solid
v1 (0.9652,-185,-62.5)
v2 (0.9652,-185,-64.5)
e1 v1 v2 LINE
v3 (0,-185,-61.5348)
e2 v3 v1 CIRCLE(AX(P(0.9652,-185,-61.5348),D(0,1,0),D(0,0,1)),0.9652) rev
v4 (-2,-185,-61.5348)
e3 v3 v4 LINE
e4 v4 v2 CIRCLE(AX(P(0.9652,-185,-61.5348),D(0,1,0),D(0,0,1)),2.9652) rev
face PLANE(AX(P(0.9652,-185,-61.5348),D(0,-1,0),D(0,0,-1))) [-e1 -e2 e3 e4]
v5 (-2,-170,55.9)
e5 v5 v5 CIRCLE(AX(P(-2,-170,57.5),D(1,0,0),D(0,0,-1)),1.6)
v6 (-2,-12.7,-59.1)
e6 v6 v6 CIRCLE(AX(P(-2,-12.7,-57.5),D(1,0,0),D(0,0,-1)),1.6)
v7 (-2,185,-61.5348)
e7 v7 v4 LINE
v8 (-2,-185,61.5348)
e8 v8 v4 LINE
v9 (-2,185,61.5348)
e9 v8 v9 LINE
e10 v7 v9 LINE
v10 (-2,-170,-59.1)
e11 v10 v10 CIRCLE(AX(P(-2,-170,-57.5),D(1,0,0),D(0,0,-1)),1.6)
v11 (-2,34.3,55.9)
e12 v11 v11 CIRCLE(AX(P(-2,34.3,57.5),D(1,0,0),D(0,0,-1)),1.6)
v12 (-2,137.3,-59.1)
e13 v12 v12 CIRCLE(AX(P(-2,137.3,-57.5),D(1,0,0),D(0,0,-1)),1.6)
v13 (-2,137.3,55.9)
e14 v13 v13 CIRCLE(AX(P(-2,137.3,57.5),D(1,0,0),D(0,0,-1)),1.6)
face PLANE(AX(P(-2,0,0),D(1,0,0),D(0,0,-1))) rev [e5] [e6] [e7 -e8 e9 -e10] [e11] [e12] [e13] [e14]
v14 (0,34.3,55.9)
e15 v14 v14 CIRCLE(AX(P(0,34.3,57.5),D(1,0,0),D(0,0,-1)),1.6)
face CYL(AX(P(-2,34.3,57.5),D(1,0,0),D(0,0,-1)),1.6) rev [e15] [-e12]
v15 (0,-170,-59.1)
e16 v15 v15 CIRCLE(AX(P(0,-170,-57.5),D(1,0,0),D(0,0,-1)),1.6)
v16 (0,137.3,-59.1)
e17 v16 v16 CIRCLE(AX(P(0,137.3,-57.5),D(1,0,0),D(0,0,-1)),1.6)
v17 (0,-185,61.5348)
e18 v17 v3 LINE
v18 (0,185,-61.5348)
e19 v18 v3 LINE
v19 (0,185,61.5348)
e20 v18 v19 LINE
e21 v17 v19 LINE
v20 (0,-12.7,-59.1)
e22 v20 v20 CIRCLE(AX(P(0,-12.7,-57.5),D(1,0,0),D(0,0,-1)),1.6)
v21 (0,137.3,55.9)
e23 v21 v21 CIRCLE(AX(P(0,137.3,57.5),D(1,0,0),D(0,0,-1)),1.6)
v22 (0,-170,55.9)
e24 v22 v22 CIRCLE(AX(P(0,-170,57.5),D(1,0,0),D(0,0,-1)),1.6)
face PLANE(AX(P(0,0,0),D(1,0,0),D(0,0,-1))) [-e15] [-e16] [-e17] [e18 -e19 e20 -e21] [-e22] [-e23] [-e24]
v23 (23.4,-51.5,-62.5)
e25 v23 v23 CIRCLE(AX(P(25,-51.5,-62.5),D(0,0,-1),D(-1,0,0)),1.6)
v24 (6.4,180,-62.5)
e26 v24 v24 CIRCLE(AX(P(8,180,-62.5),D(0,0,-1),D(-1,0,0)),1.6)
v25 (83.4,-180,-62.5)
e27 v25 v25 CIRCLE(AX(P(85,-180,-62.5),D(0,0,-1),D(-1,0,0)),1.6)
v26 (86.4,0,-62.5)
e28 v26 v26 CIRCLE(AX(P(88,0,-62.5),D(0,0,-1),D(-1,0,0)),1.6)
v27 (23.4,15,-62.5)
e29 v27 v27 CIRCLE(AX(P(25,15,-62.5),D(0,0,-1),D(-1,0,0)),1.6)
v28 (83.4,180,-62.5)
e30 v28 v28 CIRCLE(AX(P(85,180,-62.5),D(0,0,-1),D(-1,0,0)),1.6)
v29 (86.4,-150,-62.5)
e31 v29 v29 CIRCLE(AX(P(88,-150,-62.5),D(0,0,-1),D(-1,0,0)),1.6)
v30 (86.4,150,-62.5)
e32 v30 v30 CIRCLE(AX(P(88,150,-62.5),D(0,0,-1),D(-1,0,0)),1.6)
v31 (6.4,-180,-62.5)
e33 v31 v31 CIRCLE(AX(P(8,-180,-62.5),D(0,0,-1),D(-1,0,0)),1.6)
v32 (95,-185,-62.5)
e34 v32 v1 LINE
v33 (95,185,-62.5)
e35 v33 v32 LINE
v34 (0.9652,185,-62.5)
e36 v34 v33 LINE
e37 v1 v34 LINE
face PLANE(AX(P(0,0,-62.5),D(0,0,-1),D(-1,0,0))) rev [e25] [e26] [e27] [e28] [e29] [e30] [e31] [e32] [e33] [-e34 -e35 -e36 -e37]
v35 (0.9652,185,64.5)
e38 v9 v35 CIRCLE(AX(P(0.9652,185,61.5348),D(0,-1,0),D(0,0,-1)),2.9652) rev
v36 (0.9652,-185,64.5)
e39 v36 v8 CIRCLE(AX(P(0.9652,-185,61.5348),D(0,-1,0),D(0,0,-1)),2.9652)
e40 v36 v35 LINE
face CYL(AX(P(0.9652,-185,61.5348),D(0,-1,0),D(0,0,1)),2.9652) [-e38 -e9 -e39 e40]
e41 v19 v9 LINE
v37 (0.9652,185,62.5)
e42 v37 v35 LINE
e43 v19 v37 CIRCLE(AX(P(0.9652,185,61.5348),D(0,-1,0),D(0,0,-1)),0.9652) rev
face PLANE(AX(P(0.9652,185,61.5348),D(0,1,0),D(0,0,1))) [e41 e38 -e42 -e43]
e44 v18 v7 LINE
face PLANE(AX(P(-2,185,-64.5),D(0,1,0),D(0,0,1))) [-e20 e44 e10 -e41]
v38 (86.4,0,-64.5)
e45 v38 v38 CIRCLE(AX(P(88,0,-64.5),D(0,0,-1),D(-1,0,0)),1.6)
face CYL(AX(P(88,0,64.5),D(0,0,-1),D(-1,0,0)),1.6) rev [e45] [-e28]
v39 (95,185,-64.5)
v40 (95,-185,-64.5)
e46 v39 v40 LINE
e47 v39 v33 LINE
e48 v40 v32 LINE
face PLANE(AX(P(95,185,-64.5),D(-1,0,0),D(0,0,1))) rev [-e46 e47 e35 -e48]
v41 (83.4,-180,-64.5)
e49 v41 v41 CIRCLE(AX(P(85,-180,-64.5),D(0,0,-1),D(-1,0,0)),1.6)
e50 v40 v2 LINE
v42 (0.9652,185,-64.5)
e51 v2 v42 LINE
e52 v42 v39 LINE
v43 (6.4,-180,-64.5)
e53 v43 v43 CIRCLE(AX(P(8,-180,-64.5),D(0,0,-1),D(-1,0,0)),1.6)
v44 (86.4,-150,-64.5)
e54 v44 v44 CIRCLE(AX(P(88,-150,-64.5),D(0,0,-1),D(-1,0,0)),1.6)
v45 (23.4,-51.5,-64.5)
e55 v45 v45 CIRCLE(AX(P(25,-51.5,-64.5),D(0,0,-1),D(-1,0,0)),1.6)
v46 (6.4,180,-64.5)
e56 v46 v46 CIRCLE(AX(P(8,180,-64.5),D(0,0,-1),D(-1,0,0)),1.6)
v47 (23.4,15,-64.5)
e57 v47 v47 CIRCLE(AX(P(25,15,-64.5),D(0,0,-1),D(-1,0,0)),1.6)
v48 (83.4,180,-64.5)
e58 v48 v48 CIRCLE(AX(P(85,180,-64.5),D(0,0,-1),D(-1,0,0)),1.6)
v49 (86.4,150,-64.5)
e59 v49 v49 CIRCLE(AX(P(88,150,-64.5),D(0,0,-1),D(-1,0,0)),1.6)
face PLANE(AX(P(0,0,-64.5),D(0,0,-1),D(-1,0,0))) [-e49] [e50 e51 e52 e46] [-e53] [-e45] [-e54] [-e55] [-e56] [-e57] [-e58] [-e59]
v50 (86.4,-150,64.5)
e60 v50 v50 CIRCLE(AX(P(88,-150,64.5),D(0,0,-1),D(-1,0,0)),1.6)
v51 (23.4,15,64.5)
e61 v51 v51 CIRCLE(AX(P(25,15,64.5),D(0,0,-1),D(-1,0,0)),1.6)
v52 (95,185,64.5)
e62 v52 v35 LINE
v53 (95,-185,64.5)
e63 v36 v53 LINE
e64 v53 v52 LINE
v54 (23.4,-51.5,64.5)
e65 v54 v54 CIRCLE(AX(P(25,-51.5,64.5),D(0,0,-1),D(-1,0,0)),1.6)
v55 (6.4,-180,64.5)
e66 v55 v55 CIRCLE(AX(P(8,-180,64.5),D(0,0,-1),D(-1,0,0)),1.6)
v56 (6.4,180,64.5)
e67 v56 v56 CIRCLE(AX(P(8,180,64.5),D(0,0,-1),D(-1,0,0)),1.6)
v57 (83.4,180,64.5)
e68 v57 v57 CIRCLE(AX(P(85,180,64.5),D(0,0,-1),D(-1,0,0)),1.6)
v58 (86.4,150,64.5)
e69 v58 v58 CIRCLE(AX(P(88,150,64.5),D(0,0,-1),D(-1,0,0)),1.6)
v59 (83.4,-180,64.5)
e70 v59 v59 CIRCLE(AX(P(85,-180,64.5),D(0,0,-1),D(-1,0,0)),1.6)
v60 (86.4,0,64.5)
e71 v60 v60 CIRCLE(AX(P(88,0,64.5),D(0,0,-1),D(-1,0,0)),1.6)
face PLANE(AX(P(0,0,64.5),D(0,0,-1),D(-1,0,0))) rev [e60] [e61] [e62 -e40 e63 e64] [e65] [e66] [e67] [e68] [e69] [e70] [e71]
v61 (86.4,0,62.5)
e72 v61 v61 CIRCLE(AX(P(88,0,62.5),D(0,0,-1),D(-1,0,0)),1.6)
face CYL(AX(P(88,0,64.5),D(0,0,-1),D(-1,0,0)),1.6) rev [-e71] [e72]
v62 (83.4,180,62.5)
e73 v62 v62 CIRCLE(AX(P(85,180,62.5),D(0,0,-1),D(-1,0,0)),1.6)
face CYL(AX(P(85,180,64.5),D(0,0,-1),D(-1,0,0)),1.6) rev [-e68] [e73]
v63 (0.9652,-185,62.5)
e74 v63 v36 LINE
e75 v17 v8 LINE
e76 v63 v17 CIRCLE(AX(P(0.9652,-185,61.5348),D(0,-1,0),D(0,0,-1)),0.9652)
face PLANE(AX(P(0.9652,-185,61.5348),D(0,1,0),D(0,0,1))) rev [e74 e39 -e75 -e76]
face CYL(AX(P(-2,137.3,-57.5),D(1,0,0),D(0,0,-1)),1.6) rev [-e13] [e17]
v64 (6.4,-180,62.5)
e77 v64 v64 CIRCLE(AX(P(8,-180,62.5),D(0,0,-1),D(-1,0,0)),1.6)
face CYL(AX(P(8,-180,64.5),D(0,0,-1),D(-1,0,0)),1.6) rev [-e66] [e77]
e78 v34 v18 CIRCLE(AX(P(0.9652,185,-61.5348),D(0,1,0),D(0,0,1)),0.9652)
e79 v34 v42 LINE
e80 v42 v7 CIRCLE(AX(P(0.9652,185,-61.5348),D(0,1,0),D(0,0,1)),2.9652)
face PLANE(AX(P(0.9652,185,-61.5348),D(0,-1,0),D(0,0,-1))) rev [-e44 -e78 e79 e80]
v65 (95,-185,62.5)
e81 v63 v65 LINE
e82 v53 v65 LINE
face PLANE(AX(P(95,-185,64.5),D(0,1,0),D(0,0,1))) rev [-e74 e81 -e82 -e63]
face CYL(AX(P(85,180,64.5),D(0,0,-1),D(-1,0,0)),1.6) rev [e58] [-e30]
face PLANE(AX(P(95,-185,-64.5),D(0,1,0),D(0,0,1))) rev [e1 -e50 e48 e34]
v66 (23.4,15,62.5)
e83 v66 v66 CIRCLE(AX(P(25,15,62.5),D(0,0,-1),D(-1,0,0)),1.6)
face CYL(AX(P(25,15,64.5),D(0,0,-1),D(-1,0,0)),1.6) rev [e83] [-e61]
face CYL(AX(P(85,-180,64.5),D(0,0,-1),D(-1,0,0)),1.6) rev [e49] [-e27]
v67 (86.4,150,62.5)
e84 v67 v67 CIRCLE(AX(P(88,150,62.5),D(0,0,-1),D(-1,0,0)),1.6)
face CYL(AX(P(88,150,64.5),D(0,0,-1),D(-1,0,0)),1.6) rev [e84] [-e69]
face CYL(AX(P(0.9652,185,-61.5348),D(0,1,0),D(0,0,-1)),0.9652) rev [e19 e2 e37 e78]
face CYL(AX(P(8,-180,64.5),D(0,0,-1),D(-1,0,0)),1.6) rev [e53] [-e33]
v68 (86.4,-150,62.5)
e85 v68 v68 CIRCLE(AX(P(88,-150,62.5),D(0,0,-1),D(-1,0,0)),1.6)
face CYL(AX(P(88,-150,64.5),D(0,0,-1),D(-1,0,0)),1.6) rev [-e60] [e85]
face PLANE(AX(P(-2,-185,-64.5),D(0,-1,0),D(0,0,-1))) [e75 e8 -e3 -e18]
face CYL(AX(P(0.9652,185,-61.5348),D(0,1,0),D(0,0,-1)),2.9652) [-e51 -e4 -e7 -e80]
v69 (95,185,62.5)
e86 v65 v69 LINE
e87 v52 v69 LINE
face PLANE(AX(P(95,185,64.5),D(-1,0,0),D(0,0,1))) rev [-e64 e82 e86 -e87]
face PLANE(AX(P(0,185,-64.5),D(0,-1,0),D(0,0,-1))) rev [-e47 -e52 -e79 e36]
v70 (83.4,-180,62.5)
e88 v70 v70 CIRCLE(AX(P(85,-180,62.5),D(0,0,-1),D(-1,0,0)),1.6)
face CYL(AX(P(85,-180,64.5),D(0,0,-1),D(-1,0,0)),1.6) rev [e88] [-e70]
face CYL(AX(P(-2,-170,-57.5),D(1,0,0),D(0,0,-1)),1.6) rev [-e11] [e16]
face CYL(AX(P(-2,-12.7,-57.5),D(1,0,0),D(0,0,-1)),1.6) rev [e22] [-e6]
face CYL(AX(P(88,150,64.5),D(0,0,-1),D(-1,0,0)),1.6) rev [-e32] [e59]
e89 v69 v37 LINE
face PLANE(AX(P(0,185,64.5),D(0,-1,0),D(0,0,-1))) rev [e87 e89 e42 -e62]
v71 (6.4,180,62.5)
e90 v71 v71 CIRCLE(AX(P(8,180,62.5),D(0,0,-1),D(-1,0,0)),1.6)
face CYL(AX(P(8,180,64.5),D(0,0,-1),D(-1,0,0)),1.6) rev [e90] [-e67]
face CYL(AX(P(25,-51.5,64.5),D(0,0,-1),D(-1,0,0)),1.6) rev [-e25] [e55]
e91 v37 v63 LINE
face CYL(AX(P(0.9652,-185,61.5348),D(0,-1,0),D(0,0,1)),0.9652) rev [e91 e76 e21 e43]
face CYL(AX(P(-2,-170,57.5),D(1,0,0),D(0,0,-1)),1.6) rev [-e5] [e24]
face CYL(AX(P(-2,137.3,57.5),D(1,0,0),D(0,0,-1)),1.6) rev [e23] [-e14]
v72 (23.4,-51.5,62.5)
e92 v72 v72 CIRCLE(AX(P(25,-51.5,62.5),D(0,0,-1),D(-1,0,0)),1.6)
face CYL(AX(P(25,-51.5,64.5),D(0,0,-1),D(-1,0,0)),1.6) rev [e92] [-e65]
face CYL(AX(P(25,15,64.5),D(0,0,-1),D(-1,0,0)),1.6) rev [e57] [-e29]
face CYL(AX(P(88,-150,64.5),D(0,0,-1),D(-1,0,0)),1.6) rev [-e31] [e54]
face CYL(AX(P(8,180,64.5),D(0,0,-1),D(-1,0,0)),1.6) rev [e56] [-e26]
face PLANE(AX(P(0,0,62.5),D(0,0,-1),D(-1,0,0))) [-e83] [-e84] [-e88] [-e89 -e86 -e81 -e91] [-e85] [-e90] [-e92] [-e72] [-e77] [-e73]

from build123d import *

# Parameters (mm, degrees)
SKETCH1_W                      = 370
SKETCH1_H                      = 129
SKETCH1_R                      = 1.6
BASE_FLANGE2_DEPTH             = 2
EDGE_FLANGE2_STRIP_W           = 9.9304
EDGE_FLANGE2_STRIP_H           = 2
EDGE_FLANGE2_STRIP_CUT_DEPTH   = 370
EDGE_FLANGE2_STRIP_2_W         = 9.9304
EDGE_FLANGE2_STRIP_2_H         = 2
EDGE_FLANGE2_STRIP_CUT_2_DEPTH = 370
EDGE_FLANGE2_DEPTH             = 370
EDGE_FLANGE2_BEND_DEPTH        = 370
SKETCH23_R                     = 1.6
CUT_EXTRUDE2_DEPTH             = 245.726377818


# Sheet-metal steps are written as plain solids
with BuildPart() as part:
    # Sketch1 → Base-Flange2 (new body)
    with BuildSketch(Plane.YZ):
        Rectangle(SKETCH1_W, SKETCH1_H)
        with Locations(Location((-170, 57.5, 0), (0, 0, 270))):
            Circle(SKETCH1_R, mode=Mode.SUBTRACT)
        with Locations(Location((137.3, 57.5, 0), (0, 0, 270))):
            Circle(SKETCH1_R, mode=Mode.SUBTRACT)
        with Locations(Location((-170, -57.5, 0), (0, 0, 270))):
            Circle(SKETCH1_R, mode=Mode.SUBTRACT)
        with Locations(Location((137.3, -57.5, 0), (0, 0, 270))):
            Circle(SKETCH1_R, mode=Mode.SUBTRACT)
        with Locations(Location((34.3, 57.5, 0), (0, 0, 270))):
            Circle(SKETCH1_R, mode=Mode.SUBTRACT)
        with Locations(Location((-12.7, -57.5, 0), (0, 0, 270))):
            Circle(SKETCH1_R, mode=Mode.SUBTRACT)
    extrude(amount=-BASE_FLANGE2_DEPTH)

    # Edge-Flange2 strip (across the edge) → Edge-Flange2 strip cut (cut)
    with BuildSketch(Plane(origin=(0, -185, -64.5), x_dir=(0, 0, 1), z_dir=(0, 1, 0))):
        with Locations((-2, -1)):
            Rectangle(EDGE_FLANGE2_STRIP_W, EDGE_FLANGE2_STRIP_H)
    extrude(amount=EDGE_FLANGE2_STRIP_CUT_DEPTH, mode=Mode.SUBTRACT)

    # Edge-Flange2 strip 2 (across the edge) → Edge-Flange2 strip cut 2 (cut)
    with BuildSketch(Plane(origin=(0, 185, 64.5), x_dir=(0, 0, -1), z_dir=(0, -1, 0))):
        with Locations((-2, -1)):
            Rectangle(EDGE_FLANGE2_STRIP_2_W, EDGE_FLANGE2_STRIP_2_H)
    extrude(amount=EDGE_FLANGE2_STRIP_CUT_2_DEPTH, mode=Mode.SUBTRACT)

    # Edge-Flange2 section (across the edge) → Edge-Flange2 (add)
    with BuildSketch(Plane(origin=(0, -185, -64.5), x_dir=(0, 0, 1), z_dir=(0, 1, 0))):
        with BuildLine():
            Line((0, 0.9652), (0, 95))
            Line((0, 95), (2, 95))
            Line((2, 95), (2, 0.9652))
            ThreePointArc((2, 0.9652), (2.282700535, 0.282700535), (2.9652, 0))
            Line((2.9652, 0), (2.9652, -2))
            ThreePointArc((2.9652, -2), (0.868486972, -1.131513028), (0, 0.9652))
        make_face()
    extrude(amount=EDGE_FLANGE2_DEPTH)

    # Edge-Flange2 section 2 (across the edge) → Edge-Flange2 bend (add)
    with BuildSketch(Plane(origin=(0, 185, 64.5), x_dir=(0, 0, -1), z_dir=(0, -1, 0))):
        with BuildLine():
            Line((0, 0.9652), (0, 95))
            Line((0, 95), (2, 95))
            Line((2, 95), (2, 0.9652))
            ThreePointArc((2, 0.9652), (2.282700535, 0.282700535), (2.9652, 0))
            Line((2.9652, 0), (2.9652, -2))
            ThreePointArc((2.9652, -2), (0.868486972, -1.131513028), (0, 0.9652))
        make_face()
    extrude(amount=EDGE_FLANGE2_BEND_DEPTH)

    # Sketch23 → Cut-Extrude2 (cut, through all)
    with BuildSketch(Plane(origin=(0, 0, -64.5), x_dir=(1, 0, 0), z_dir=(0, 0, -1))):
        with Locations(Location((88, 150, 0), (0, 0, 180))):
            Circle(SKETCH23_R)
        with Locations(Location((88, 0, 0), (0, 0, 180))):
            Circle(SKETCH23_R)
        with Locations(Location((88, -150, 0), (0, 0, 180))):
            Circle(SKETCH23_R)
        with Locations(Location((8, 180, 0), (0, 0, 180))):
            Circle(SKETCH23_R)
        with Locations(Location((85, 180, 0), (0, 0, 180))):
            Circle(SKETCH23_R)
        with Locations(Location((8, -180, 0), (0, 0, 180))):
            Circle(SKETCH23_R)
        with Locations(Location((85, -180, 0), (0, 0, 180))):
            Circle(SKETCH23_R)
        with Locations(Location((25, -15, 0), (0, 0, 180))):
            Circle(SKETCH23_R)
        with Locations(Location((25, 51.5, 0), (0, 0, 180))):
            Circle(SKETCH23_R)
    extrude(amount=-CUT_EXTRUDE2_DEPTH, mode=Mode.SUBTRACT)


solid = part.part
